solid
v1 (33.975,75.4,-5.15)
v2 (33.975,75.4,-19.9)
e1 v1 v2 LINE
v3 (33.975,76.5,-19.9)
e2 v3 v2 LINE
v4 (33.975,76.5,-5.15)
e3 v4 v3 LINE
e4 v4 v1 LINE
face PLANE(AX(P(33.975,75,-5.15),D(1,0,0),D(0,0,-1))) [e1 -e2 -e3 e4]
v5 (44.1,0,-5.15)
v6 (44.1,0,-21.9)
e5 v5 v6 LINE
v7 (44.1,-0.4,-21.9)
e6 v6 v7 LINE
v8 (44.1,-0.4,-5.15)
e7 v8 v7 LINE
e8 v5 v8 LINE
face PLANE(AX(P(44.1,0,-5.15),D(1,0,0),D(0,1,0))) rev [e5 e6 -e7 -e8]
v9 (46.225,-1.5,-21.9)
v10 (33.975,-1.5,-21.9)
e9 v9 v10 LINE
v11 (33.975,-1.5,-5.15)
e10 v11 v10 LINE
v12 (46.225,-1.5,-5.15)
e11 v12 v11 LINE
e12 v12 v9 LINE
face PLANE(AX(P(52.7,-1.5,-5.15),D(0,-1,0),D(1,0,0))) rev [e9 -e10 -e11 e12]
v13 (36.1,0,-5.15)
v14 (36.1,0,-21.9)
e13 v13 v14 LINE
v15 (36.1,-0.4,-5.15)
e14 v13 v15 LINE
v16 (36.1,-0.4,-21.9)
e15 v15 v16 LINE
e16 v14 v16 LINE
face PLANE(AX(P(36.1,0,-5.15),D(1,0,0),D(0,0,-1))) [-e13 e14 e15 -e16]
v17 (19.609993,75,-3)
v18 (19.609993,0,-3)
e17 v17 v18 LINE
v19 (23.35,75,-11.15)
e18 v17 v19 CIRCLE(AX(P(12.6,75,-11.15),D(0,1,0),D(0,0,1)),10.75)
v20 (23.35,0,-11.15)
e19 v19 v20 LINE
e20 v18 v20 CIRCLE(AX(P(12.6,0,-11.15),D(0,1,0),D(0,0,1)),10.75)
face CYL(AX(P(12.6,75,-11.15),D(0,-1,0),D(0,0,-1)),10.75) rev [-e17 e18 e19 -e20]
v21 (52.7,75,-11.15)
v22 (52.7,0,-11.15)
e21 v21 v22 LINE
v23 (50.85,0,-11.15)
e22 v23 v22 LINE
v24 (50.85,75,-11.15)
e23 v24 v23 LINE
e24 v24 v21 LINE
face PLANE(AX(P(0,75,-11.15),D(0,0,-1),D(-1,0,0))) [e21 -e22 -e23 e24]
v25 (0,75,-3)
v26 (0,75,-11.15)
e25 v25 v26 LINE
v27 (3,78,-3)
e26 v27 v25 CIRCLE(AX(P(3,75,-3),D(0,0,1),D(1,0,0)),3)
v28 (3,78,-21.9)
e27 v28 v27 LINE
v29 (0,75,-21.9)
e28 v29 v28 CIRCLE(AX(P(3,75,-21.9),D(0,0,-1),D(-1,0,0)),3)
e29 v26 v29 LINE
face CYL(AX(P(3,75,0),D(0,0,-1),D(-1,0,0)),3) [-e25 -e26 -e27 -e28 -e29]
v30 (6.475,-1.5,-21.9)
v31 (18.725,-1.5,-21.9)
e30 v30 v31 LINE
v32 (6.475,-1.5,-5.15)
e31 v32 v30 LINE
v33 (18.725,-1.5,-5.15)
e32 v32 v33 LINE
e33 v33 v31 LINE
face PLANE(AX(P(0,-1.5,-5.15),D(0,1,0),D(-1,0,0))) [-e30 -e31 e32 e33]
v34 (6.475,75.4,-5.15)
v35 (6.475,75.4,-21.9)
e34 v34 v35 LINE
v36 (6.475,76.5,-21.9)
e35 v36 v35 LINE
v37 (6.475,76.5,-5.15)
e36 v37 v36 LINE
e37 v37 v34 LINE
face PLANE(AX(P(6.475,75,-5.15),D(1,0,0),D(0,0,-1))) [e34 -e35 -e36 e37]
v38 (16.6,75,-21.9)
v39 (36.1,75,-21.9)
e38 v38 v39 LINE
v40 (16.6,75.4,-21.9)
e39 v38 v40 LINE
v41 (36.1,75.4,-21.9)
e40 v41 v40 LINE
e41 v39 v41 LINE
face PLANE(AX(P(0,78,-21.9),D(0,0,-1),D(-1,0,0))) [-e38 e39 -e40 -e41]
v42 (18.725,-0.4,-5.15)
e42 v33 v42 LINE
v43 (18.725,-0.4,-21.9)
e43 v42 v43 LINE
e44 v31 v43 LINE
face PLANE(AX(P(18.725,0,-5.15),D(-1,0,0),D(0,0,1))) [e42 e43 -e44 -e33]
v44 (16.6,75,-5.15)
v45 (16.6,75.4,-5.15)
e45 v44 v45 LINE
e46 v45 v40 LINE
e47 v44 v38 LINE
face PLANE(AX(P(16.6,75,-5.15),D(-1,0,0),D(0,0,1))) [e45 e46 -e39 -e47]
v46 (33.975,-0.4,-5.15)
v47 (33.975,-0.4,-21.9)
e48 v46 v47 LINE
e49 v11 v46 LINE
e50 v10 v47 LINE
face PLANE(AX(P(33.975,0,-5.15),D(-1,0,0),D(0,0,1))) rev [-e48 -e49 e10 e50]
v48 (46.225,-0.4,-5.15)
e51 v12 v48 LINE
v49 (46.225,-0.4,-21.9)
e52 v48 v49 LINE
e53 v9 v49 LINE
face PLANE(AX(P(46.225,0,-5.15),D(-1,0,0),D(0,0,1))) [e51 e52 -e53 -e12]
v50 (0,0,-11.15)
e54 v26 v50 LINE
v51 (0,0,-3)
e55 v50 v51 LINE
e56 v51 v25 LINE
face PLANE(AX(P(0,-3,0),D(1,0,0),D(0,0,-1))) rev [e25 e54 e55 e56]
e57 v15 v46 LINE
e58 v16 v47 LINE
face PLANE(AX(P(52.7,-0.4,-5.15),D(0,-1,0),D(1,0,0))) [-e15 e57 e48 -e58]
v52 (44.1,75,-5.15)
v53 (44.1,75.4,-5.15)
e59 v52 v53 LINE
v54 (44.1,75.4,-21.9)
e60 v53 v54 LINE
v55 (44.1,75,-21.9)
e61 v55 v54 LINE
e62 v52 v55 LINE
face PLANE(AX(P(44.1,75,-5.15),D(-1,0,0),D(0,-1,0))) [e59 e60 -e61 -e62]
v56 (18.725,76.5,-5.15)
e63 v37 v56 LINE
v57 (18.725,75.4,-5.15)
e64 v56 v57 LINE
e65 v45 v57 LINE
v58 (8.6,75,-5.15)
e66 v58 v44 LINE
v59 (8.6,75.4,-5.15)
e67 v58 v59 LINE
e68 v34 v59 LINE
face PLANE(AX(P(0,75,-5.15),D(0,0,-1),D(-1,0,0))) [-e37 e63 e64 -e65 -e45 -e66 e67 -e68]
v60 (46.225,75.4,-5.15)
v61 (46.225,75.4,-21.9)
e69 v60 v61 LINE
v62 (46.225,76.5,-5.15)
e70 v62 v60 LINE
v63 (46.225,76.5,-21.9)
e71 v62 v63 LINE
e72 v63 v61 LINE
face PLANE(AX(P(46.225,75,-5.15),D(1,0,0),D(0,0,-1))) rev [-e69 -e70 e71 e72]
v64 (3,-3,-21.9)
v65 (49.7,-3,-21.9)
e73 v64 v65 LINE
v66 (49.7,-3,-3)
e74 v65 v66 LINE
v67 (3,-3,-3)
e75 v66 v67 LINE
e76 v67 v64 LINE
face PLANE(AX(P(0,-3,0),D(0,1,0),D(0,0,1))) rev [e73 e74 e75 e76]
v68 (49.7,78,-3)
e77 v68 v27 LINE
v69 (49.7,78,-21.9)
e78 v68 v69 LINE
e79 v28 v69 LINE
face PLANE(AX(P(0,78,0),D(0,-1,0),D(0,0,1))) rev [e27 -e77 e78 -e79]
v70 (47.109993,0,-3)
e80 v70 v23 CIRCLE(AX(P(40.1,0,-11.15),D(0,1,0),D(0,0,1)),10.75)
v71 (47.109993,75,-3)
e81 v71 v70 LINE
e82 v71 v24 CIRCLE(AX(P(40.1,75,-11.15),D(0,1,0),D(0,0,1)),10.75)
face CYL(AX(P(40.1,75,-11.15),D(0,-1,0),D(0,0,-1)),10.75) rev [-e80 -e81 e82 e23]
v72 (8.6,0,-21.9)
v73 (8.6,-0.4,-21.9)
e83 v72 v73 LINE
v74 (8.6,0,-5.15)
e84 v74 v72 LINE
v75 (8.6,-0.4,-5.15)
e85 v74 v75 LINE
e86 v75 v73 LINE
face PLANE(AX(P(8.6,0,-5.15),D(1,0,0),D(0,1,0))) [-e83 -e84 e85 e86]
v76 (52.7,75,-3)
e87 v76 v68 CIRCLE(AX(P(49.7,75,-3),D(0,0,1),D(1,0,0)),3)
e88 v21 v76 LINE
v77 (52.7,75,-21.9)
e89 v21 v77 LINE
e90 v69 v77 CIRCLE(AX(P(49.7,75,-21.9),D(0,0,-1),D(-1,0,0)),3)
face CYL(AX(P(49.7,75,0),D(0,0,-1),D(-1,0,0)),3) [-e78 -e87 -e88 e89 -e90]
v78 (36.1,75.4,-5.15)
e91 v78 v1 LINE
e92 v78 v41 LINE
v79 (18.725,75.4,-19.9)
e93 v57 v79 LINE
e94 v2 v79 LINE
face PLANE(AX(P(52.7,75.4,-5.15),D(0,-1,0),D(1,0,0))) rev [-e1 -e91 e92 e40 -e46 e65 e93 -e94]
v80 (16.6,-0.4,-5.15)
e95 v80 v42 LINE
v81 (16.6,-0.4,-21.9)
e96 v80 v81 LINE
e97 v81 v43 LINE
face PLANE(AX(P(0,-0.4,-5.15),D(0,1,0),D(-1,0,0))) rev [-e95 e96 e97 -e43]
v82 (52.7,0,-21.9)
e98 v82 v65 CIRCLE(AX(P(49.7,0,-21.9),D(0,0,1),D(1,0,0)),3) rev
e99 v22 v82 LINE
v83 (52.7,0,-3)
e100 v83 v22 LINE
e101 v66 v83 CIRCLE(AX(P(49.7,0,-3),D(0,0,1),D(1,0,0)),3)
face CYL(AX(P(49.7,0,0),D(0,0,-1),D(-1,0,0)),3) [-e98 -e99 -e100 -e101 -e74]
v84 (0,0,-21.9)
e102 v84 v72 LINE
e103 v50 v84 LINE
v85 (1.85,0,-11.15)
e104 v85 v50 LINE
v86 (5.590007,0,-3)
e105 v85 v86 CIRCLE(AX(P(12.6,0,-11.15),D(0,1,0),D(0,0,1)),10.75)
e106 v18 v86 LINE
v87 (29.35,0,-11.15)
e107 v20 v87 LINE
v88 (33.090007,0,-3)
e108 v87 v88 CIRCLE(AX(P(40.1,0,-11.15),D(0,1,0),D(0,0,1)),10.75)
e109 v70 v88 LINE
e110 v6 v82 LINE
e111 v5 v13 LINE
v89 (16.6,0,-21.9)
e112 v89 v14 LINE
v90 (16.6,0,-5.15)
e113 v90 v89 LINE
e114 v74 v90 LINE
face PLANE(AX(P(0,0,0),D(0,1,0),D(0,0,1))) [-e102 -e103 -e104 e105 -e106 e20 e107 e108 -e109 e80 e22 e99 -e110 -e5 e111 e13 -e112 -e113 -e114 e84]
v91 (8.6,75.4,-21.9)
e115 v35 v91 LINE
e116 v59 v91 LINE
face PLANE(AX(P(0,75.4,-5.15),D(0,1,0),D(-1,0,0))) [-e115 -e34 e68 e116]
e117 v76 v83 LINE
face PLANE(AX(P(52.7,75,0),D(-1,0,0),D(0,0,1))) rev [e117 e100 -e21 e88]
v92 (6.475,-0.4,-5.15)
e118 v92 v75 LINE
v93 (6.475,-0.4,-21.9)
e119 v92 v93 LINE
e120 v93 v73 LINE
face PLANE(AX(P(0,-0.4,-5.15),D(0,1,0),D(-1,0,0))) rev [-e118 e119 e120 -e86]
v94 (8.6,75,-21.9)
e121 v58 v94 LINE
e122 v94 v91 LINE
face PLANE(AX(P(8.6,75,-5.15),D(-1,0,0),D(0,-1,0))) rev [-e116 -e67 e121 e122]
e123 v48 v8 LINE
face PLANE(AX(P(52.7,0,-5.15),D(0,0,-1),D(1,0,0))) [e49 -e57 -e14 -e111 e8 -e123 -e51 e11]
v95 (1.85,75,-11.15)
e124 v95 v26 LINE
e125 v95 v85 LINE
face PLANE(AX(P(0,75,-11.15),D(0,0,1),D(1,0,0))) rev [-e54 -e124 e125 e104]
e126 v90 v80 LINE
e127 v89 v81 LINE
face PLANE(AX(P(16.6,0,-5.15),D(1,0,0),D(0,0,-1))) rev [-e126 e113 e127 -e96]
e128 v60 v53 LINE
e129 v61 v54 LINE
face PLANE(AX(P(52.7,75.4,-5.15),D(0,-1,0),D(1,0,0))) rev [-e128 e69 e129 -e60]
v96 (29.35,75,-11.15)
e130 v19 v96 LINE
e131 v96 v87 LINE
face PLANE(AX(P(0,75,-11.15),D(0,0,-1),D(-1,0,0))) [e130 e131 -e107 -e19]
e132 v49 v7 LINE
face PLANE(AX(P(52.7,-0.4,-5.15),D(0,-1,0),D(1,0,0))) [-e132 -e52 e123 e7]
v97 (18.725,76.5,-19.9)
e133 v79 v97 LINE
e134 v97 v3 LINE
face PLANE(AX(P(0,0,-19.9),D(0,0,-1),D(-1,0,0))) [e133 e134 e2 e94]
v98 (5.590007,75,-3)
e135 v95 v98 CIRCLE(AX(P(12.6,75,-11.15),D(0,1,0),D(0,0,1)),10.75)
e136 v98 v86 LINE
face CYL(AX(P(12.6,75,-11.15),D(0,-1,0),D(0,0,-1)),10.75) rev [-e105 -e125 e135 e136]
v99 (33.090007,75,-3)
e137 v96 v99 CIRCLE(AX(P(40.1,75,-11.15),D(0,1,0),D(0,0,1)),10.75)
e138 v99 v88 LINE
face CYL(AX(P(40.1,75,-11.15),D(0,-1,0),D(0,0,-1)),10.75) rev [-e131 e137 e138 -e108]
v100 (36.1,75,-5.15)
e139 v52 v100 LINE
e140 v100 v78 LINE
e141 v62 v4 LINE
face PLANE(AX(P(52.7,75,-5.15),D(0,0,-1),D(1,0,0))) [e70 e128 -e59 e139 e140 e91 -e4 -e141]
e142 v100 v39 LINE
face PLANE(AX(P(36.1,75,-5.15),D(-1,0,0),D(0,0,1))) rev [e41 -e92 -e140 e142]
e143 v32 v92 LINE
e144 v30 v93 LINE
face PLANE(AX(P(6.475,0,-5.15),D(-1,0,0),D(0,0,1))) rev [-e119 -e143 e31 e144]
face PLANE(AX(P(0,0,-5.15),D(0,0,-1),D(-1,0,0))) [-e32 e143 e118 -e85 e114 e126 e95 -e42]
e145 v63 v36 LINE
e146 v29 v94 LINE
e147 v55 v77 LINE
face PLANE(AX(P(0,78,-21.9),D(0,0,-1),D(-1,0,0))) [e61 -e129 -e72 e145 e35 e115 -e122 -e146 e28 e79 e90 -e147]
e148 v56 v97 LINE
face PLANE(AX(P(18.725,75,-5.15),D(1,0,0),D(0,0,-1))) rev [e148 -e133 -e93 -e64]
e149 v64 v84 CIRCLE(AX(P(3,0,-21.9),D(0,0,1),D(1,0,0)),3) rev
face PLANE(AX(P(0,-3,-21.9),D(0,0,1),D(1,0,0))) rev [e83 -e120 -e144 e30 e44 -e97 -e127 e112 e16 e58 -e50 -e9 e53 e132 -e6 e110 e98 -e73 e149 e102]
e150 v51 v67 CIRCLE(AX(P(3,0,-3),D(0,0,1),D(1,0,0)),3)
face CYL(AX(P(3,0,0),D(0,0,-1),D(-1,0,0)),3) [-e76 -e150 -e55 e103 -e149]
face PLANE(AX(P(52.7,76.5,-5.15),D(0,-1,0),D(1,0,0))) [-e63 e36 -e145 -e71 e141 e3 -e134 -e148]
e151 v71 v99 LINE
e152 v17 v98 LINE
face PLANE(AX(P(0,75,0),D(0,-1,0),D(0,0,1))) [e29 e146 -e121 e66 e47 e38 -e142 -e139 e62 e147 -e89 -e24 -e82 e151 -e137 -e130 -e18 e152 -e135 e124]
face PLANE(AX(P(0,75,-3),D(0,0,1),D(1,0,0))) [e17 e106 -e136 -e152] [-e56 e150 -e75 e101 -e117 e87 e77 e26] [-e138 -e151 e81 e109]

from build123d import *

# Parameters (mm, degrees)
BOSS_EXTRUDE1_DEPTH  = 75
SKETCH1_3_W          = 52.7
SKETCH1_3_H          = 18.9
BOSS_EXTRUDE2_DEPTH  = 3
CUT_EXTRUDE1_DEPTH   = 16.75
MIRROR3_COPY_1_DEPTH = 16.75
SKETCH5_W            = 15.25
SKETCH5_H            = 1.1
CUT_EXTRUDE2_DEPTH   = 2
FILLET1_R            = 3


with BuildPart() as part:
    # Sketch1 → Boss-Extrude1 (new body)
    with BuildSketch(Plane(origin=(0, 0, 0), x_dir=(1, 0, 0), z_dir=(0, 1, 0))):
        with BuildLine():
            Line((47.109992867, 3), (52.7, 3))
            Line((52.7, 3), (52.7, 11.15))
            Line((52.7, 11.15), (50.85, 11.15))
            ThreePointArc((50.85, 11.15), (49.870361389, 6.666414567), (47.109992867, 3))
        make_face()
        with BuildLine():
            Line((26.35, 11.15), (26.35, 3))
            Line((26.35, 3), (33.090007133, 3))
            ThreePointArc((33.090007133, 3), (30.329638611, 6.666414567), (29.35, 11.15))
            Line((29.35, 11.15), (26.35, 11.15))
        make_face()
        with BuildLine():
            Line((19.609992867, 3), (26.35, 3))
            Line((26.35, 3), (26.35, 11.15))
            Line((26.35, 11.15), (23.35, 11.15))
            ThreePointArc((23.35, 11.15), (22.370361389, 6.666414567), (19.609992867, 3))
        make_face()
        with BuildLine():
            Line((0, 3), (5.590007133, 3))
            ThreePointArc((5.590007133, 3), (2.829638611, 6.666414567), (1.85, 11.15))
            Line((1.85, 11.15), (0, 11.15))
            Line((0, 11.15), (0, 3))
        make_face()
    extrude(amount=BOSS_EXTRUDE1_DEPTH)

    # Sketch1<3> → Boss-Extrude2 (add)
    with BuildSketch(Plane(origin=(0, 0, 0), x_dir=(1, 0, 0), z_dir=(0, 1, 0))):
        with Locations((26.35, 12.45)):
            Rectangle(SKETCH1_3_W, SKETCH1_3_H)
    boss_extrude2 = extrude(amount=-BOSS_EXTRUDE2_DEPTH)

    # Sketch4 → Cut-Extrude1 (cut)
    with BuildSketch(Plane(origin=(0, 0, -21.9), x_dir=(-1, 0, 0), z_dir=(0, 0, -1))):
        Polygon((-18.725, -1.5), (-6.475, -1.5), (-6.475, -0.4), (-8.6, -0.4), (-8.6, 0), (-16.6, 0), (-16.6, -0.4), (-18.725, -0.4), align=None)
    cut_extrude1 = extrude(amount=-CUT_EXTRUDE1_DEPTH, mode=Mode.SUBTRACT)

    # Mirror2: Cut-Extrude1 across plane
    add(cut_extrude1.mirror(Plane(origin=(26.35, 0, 0), x_dir=(0, 0, 1), z_dir=(1, 0, 0))), mode=Mode.SUBTRACT)

    # Mirror3: Boss-Extrude2, Cut-Extrude1 across plane
    add(boss_extrude2.mirror(Plane.ZX.offset(37.5)))
    add(cut_extrude1.mirror(Plane.ZX.offset(37.5)), mode=Mode.SUBTRACT)

    # Mirror3 copy 1 sketch → Mirror3 copy 1 (cut)
    with BuildSketch(Plane(origin=(52.7, 75, -21.9), x_dir=(1, 0, 0), z_dir=(0, 0, -1))):
        Polygon((-18.725, -1.5), (-6.475, -1.5), (-6.475, -0.4), (-8.6, -0.4), (-8.6, 0), (-16.6, 0), (-16.6, -0.4), (-18.725, -0.4), align=None)
    extrude(amount=-MIRROR3_COPY_1_DEPTH, mode=Mode.SUBTRACT)

    # Sketch5 → Cut-Extrude2 (cut)
    with BuildSketch(Plane(origin=(0, 0, -21.9), x_dir=(-1, 0, 0), z_dir=(0, 0, -1))):
        with Locations((-26.35, 75.95)):
            Rectangle(SKETCH5_W, SKETCH5_H)
    extrude(amount=-CUT_EXTRUDE2_DEPTH, mode=Mode.SUBTRACT)

    # Fillet1
    fillet1_edges = [part.edges().sort_by_distance(p)[0] for p in [
        (0, 78, -12.45),
        (52.7, 78, -12.45),
        (52.7, -3, -12.45),
        (0, -3, -12.45),
    ]]
    fillet(fillet1_edges, radius=FILLET1_R - 0.0001)  # a hair under: the kernel refuses the full size


solid = part.part
